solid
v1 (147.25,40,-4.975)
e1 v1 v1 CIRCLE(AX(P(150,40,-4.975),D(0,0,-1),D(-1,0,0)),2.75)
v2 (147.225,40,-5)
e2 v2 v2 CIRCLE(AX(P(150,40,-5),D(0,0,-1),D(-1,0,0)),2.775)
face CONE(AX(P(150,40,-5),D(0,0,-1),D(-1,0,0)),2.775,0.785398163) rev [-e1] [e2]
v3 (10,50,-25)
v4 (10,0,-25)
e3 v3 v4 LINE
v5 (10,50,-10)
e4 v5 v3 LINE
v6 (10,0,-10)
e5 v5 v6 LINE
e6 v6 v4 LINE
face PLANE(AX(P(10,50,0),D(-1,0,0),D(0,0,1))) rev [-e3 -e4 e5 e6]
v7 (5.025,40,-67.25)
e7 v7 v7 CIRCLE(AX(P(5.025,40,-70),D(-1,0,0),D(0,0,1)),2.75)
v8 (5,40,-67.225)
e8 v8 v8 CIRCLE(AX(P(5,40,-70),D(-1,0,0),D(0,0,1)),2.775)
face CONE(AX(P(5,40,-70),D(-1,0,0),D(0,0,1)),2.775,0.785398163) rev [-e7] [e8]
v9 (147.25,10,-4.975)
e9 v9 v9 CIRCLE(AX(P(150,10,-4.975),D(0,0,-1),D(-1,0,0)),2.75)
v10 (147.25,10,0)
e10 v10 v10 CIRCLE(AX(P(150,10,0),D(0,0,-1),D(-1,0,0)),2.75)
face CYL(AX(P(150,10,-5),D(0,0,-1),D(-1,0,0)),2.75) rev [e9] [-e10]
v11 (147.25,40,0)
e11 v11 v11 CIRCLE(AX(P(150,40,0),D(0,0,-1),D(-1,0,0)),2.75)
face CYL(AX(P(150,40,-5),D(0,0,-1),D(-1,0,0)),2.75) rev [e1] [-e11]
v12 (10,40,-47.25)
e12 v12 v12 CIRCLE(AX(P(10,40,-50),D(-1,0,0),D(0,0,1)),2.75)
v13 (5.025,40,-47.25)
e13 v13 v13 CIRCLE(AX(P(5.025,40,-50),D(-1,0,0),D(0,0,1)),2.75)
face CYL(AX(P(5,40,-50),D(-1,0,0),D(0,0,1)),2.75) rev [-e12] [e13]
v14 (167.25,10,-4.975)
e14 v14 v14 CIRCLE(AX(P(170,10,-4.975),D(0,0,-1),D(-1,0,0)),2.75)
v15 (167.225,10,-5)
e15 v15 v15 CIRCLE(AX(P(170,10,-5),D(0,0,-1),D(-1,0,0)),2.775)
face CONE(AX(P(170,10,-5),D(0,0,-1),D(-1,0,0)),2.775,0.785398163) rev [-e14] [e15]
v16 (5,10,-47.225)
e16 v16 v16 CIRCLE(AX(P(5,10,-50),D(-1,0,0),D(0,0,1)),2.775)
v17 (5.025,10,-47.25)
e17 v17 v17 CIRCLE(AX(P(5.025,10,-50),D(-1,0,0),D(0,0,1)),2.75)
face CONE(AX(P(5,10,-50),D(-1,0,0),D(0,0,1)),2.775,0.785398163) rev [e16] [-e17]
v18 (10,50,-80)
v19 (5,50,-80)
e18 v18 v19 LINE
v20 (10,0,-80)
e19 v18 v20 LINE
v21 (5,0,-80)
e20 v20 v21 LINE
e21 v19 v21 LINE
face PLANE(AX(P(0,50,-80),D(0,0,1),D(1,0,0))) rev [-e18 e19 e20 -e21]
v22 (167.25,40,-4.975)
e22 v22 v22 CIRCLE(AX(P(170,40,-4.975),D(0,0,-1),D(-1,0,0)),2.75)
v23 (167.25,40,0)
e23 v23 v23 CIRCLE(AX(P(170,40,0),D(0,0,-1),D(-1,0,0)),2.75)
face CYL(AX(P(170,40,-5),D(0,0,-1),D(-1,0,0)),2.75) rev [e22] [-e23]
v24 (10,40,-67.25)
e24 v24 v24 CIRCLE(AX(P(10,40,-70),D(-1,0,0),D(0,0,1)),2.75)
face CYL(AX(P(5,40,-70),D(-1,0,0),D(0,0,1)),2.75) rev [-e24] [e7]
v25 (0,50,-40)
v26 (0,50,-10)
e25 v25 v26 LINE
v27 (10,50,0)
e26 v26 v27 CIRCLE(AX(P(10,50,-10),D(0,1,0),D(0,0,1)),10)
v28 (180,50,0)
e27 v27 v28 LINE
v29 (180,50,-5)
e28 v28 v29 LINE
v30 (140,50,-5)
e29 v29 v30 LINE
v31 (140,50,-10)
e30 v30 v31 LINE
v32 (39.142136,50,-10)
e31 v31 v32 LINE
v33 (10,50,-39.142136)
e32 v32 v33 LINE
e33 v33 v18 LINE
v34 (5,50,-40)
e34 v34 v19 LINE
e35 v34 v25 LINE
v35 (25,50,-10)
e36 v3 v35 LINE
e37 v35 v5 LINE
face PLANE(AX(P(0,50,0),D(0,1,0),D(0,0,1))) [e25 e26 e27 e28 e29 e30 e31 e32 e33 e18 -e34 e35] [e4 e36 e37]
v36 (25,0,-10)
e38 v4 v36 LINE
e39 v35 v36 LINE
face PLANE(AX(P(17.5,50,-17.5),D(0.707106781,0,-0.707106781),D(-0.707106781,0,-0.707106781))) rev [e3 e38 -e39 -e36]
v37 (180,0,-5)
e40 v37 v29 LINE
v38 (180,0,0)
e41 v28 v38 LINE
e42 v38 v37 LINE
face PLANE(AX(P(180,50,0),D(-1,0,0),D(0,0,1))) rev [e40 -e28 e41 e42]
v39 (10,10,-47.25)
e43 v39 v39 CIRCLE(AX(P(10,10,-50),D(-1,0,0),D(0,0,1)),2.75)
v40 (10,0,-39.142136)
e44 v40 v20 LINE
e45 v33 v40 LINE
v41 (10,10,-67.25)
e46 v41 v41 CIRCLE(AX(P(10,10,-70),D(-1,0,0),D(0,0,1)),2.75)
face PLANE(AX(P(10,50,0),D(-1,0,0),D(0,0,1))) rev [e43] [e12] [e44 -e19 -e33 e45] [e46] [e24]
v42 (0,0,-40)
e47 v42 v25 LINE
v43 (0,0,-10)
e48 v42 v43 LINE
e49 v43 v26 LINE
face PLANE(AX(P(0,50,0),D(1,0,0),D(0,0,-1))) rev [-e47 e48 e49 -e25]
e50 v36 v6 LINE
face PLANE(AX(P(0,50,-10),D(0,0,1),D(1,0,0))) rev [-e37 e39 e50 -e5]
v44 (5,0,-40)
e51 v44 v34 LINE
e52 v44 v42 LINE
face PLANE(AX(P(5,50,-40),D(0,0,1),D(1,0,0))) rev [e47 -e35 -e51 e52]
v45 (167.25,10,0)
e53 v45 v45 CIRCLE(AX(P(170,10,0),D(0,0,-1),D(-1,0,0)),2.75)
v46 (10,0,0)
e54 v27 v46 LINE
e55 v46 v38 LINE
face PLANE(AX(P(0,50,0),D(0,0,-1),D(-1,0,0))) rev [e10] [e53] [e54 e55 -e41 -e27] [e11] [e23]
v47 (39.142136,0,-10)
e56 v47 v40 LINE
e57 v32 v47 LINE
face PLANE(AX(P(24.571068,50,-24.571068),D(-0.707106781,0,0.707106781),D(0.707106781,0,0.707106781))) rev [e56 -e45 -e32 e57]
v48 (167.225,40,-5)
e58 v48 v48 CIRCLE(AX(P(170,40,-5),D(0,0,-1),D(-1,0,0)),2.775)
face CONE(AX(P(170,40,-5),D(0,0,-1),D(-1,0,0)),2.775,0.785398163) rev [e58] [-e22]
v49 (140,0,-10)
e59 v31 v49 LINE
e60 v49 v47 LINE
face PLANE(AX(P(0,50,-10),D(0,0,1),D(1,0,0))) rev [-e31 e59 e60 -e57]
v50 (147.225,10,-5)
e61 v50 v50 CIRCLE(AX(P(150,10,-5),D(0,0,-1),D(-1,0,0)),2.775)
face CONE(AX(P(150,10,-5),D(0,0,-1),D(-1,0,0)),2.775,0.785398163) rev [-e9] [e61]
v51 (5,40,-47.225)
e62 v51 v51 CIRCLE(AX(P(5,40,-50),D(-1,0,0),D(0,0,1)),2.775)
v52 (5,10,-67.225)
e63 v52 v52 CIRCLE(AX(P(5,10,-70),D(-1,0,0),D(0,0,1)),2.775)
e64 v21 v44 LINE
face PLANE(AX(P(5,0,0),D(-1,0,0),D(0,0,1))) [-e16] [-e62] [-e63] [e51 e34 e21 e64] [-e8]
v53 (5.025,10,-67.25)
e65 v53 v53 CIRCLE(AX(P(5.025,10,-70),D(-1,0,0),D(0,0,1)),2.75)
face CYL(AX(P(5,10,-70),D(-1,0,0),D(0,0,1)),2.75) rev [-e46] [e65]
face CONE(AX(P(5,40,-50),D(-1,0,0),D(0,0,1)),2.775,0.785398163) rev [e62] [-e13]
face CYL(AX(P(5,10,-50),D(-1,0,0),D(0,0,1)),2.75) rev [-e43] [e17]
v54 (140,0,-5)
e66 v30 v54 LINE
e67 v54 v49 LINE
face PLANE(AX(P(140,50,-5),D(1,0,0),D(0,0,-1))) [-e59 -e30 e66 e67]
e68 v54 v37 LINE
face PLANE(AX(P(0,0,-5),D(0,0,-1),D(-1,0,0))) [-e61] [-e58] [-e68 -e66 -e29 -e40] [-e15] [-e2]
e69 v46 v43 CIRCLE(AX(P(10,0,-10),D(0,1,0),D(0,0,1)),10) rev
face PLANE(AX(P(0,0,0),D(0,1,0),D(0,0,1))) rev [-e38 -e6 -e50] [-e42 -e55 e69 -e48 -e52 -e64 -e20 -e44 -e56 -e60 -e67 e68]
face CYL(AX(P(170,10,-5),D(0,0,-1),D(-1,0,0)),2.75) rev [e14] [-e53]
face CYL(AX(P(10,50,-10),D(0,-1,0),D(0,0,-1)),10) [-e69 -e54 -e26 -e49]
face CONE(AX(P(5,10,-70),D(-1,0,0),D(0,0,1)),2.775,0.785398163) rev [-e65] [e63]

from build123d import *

# Parameters (mm, degrees)
BOSS_EXTRUDE1_DEPTH = 50
SKETCH3_W           = 40
SKETCH3_H           = 50
CUT_EXTRUDE1_DEPTH  = 5
SKETCH7_W           = 40
SKETCH7_H           = 50
CUT_EXTRUDE2_DEPTH  = 5
FILLET1_R           = 10


# Read off the part's stored shape, not the designer's step: M5 Clearance Hole1, M5 Clearance Hole2
with BuildPart() as part:
    # Sketch1 → Boss-Extrude1 (new body)
    with BuildSketch(Plane(origin=(0, 0, 0), x_dir=(1, 0, 0), z_dir=(0, 1, 0))):
        Polygon((10, 10), (10, 80), (0, 80), (0, 0), (180, 0), (180, 10), align=None)
        Polygon((39.142135624, 10), (10, 39.142135624), (10, 25), (25, 10), align=None)
    extrude(amount=BOSS_EXTRUDE1_DEPTH)

    # Sketch3 → Cut-Extrude1 (cut)
    with BuildSketch(Plane.XY.offset(-10)):
        with Locations((160, 25)):
            Rectangle(SKETCH3_W, SKETCH3_H)
    extrude(amount=CUT_EXTRUDE1_DEPTH, mode=Mode.SUBTRACT)

    # M5 Clearance Hole1 outline → M5 Clearance Hole1 (revolve, cut)
    with BuildSketch(Plane(origin=(170, 40, 0), x_dir=(1, 0, 0), z_dir=(0, -1, 0))):
        Polygon((2.75, -4.975), (2.75, 0), (0, 0), (0, -5), (2.775, -5), align=None)
    revolve(axis=Axis((170, 40, 0), (0, 0, 1)), mode=Mode.SUBTRACT)

    # M5 Clearance Hole1 2 outline → M5 Clearance Hole1 2 (revolve, cut)
    with BuildSketch(Plane(origin=(150, 40, 0), x_dir=(1, 0, 0), z_dir=(0, -1, 0))):
        Polygon((2.75, -4.975), (2.75, 0), (0, 0), (0, -5), (2.775, -5), align=None)
    revolve(axis=Axis((150, 40, 0), (0, 0, 1)), mode=Mode.SUBTRACT)

    # M5 Clearance Hole1 3 outline → M5 Clearance Hole1 3 (revolve, cut)
    with BuildSketch(Plane(origin=(150, 10, 0), x_dir=(1, 0, 0), z_dir=(0, -1, 0))):
        Polygon((2.75, -4.975), (2.75, 0), (0, 0), (0, -5), (2.775, -5), align=None)
    revolve(axis=Axis((150, 10, 0), (0, 0, 1)), mode=Mode.SUBTRACT)

    # M5 Clearance Hole1 4 outline → M5 Clearance Hole1 4 (revolve, cut)
    with BuildSketch(Plane(origin=(170, 10, 0), x_dir=(1, 0, 0), z_dir=(0, -1, 0))):
        Polygon((2.75, -4.975), (2.75, 0), (0, 0), (0, -5), (2.775, -5), align=None)
    revolve(axis=Axis((170, 10, 0), (0, 0, 1)), mode=Mode.SUBTRACT)

    # Sketch7 → Cut-Extrude2 (cut)
    with BuildSketch(Plane.ZY):
        with Locations((-60, 25)):
            Rectangle(SKETCH7_W, SKETCH7_H)
    extrude(amount=-CUT_EXTRUDE2_DEPTH, mode=Mode.SUBTRACT)

    # M5 Clearance Hole2 outline → M5 Clearance Hole2 (revolve, cut)
    with BuildSketch(Plane(origin=(0, 40, -70), x_dir=(0, 1, 0), z_dir=(0, 0, -1))):
        Polygon((2.75, 5.025), (2.75, 10), (0, 10), (0, 5), (2.775, 5), align=None)
    revolve(axis=Axis((0, 40, -70), (1, 0, 0)), mode=Mode.SUBTRACT)

    # M5 Clearance Hole2 2 outline → M5 Clearance Hole2 2 (revolve, cut)
    with BuildSketch(Plane(origin=(0, 10, -70), x_dir=(0, 1, 0), z_dir=(0, 0, -1))):
        Polygon((2.75, 5.025), (2.75, 10), (0, 10), (0, 5), (2.775, 5), align=None)
    revolve(axis=Axis((0, 10, -70), (1, 0, 0)), mode=Mode.SUBTRACT)

    # M5 Clearance Hole2 3 outline → M5 Clearance Hole2 3 (revolve, cut)
    with BuildSketch(Plane(origin=(0, 40, -50), x_dir=(0, 1, 0), z_dir=(0, 0, -1))):
        Polygon((2.75, 5.025), (2.75, 10), (0, 10), (0, 5), (2.775, 5), align=None)
    revolve(axis=Axis((0, 40, -50), (1, 0, 0)), mode=Mode.SUBTRACT)

    # M5 Clearance Hole2 4 outline → M5 Clearance Hole2 4 (revolve, cut)
    with BuildSketch(Plane(origin=(0, 10, -50), x_dir=(0, 1, 0), z_dir=(0, 0, -1))):
        Polygon((2.75, 5.025), (2.75, 10), (0, 10), (0, 5), (2.775, 5), align=None)
    revolve(axis=Axis((0, 10, -50), (1, 0, 0)), mode=Mode.SUBTRACT)

    # Fillet1
    fillet1_edges = [part.edges().sort_by_distance(p)[0] for p in [
        (0, 25, 0),
    ]]
    fillet(fillet1_edges, radius=FILLET1_R)


solid = part.part
